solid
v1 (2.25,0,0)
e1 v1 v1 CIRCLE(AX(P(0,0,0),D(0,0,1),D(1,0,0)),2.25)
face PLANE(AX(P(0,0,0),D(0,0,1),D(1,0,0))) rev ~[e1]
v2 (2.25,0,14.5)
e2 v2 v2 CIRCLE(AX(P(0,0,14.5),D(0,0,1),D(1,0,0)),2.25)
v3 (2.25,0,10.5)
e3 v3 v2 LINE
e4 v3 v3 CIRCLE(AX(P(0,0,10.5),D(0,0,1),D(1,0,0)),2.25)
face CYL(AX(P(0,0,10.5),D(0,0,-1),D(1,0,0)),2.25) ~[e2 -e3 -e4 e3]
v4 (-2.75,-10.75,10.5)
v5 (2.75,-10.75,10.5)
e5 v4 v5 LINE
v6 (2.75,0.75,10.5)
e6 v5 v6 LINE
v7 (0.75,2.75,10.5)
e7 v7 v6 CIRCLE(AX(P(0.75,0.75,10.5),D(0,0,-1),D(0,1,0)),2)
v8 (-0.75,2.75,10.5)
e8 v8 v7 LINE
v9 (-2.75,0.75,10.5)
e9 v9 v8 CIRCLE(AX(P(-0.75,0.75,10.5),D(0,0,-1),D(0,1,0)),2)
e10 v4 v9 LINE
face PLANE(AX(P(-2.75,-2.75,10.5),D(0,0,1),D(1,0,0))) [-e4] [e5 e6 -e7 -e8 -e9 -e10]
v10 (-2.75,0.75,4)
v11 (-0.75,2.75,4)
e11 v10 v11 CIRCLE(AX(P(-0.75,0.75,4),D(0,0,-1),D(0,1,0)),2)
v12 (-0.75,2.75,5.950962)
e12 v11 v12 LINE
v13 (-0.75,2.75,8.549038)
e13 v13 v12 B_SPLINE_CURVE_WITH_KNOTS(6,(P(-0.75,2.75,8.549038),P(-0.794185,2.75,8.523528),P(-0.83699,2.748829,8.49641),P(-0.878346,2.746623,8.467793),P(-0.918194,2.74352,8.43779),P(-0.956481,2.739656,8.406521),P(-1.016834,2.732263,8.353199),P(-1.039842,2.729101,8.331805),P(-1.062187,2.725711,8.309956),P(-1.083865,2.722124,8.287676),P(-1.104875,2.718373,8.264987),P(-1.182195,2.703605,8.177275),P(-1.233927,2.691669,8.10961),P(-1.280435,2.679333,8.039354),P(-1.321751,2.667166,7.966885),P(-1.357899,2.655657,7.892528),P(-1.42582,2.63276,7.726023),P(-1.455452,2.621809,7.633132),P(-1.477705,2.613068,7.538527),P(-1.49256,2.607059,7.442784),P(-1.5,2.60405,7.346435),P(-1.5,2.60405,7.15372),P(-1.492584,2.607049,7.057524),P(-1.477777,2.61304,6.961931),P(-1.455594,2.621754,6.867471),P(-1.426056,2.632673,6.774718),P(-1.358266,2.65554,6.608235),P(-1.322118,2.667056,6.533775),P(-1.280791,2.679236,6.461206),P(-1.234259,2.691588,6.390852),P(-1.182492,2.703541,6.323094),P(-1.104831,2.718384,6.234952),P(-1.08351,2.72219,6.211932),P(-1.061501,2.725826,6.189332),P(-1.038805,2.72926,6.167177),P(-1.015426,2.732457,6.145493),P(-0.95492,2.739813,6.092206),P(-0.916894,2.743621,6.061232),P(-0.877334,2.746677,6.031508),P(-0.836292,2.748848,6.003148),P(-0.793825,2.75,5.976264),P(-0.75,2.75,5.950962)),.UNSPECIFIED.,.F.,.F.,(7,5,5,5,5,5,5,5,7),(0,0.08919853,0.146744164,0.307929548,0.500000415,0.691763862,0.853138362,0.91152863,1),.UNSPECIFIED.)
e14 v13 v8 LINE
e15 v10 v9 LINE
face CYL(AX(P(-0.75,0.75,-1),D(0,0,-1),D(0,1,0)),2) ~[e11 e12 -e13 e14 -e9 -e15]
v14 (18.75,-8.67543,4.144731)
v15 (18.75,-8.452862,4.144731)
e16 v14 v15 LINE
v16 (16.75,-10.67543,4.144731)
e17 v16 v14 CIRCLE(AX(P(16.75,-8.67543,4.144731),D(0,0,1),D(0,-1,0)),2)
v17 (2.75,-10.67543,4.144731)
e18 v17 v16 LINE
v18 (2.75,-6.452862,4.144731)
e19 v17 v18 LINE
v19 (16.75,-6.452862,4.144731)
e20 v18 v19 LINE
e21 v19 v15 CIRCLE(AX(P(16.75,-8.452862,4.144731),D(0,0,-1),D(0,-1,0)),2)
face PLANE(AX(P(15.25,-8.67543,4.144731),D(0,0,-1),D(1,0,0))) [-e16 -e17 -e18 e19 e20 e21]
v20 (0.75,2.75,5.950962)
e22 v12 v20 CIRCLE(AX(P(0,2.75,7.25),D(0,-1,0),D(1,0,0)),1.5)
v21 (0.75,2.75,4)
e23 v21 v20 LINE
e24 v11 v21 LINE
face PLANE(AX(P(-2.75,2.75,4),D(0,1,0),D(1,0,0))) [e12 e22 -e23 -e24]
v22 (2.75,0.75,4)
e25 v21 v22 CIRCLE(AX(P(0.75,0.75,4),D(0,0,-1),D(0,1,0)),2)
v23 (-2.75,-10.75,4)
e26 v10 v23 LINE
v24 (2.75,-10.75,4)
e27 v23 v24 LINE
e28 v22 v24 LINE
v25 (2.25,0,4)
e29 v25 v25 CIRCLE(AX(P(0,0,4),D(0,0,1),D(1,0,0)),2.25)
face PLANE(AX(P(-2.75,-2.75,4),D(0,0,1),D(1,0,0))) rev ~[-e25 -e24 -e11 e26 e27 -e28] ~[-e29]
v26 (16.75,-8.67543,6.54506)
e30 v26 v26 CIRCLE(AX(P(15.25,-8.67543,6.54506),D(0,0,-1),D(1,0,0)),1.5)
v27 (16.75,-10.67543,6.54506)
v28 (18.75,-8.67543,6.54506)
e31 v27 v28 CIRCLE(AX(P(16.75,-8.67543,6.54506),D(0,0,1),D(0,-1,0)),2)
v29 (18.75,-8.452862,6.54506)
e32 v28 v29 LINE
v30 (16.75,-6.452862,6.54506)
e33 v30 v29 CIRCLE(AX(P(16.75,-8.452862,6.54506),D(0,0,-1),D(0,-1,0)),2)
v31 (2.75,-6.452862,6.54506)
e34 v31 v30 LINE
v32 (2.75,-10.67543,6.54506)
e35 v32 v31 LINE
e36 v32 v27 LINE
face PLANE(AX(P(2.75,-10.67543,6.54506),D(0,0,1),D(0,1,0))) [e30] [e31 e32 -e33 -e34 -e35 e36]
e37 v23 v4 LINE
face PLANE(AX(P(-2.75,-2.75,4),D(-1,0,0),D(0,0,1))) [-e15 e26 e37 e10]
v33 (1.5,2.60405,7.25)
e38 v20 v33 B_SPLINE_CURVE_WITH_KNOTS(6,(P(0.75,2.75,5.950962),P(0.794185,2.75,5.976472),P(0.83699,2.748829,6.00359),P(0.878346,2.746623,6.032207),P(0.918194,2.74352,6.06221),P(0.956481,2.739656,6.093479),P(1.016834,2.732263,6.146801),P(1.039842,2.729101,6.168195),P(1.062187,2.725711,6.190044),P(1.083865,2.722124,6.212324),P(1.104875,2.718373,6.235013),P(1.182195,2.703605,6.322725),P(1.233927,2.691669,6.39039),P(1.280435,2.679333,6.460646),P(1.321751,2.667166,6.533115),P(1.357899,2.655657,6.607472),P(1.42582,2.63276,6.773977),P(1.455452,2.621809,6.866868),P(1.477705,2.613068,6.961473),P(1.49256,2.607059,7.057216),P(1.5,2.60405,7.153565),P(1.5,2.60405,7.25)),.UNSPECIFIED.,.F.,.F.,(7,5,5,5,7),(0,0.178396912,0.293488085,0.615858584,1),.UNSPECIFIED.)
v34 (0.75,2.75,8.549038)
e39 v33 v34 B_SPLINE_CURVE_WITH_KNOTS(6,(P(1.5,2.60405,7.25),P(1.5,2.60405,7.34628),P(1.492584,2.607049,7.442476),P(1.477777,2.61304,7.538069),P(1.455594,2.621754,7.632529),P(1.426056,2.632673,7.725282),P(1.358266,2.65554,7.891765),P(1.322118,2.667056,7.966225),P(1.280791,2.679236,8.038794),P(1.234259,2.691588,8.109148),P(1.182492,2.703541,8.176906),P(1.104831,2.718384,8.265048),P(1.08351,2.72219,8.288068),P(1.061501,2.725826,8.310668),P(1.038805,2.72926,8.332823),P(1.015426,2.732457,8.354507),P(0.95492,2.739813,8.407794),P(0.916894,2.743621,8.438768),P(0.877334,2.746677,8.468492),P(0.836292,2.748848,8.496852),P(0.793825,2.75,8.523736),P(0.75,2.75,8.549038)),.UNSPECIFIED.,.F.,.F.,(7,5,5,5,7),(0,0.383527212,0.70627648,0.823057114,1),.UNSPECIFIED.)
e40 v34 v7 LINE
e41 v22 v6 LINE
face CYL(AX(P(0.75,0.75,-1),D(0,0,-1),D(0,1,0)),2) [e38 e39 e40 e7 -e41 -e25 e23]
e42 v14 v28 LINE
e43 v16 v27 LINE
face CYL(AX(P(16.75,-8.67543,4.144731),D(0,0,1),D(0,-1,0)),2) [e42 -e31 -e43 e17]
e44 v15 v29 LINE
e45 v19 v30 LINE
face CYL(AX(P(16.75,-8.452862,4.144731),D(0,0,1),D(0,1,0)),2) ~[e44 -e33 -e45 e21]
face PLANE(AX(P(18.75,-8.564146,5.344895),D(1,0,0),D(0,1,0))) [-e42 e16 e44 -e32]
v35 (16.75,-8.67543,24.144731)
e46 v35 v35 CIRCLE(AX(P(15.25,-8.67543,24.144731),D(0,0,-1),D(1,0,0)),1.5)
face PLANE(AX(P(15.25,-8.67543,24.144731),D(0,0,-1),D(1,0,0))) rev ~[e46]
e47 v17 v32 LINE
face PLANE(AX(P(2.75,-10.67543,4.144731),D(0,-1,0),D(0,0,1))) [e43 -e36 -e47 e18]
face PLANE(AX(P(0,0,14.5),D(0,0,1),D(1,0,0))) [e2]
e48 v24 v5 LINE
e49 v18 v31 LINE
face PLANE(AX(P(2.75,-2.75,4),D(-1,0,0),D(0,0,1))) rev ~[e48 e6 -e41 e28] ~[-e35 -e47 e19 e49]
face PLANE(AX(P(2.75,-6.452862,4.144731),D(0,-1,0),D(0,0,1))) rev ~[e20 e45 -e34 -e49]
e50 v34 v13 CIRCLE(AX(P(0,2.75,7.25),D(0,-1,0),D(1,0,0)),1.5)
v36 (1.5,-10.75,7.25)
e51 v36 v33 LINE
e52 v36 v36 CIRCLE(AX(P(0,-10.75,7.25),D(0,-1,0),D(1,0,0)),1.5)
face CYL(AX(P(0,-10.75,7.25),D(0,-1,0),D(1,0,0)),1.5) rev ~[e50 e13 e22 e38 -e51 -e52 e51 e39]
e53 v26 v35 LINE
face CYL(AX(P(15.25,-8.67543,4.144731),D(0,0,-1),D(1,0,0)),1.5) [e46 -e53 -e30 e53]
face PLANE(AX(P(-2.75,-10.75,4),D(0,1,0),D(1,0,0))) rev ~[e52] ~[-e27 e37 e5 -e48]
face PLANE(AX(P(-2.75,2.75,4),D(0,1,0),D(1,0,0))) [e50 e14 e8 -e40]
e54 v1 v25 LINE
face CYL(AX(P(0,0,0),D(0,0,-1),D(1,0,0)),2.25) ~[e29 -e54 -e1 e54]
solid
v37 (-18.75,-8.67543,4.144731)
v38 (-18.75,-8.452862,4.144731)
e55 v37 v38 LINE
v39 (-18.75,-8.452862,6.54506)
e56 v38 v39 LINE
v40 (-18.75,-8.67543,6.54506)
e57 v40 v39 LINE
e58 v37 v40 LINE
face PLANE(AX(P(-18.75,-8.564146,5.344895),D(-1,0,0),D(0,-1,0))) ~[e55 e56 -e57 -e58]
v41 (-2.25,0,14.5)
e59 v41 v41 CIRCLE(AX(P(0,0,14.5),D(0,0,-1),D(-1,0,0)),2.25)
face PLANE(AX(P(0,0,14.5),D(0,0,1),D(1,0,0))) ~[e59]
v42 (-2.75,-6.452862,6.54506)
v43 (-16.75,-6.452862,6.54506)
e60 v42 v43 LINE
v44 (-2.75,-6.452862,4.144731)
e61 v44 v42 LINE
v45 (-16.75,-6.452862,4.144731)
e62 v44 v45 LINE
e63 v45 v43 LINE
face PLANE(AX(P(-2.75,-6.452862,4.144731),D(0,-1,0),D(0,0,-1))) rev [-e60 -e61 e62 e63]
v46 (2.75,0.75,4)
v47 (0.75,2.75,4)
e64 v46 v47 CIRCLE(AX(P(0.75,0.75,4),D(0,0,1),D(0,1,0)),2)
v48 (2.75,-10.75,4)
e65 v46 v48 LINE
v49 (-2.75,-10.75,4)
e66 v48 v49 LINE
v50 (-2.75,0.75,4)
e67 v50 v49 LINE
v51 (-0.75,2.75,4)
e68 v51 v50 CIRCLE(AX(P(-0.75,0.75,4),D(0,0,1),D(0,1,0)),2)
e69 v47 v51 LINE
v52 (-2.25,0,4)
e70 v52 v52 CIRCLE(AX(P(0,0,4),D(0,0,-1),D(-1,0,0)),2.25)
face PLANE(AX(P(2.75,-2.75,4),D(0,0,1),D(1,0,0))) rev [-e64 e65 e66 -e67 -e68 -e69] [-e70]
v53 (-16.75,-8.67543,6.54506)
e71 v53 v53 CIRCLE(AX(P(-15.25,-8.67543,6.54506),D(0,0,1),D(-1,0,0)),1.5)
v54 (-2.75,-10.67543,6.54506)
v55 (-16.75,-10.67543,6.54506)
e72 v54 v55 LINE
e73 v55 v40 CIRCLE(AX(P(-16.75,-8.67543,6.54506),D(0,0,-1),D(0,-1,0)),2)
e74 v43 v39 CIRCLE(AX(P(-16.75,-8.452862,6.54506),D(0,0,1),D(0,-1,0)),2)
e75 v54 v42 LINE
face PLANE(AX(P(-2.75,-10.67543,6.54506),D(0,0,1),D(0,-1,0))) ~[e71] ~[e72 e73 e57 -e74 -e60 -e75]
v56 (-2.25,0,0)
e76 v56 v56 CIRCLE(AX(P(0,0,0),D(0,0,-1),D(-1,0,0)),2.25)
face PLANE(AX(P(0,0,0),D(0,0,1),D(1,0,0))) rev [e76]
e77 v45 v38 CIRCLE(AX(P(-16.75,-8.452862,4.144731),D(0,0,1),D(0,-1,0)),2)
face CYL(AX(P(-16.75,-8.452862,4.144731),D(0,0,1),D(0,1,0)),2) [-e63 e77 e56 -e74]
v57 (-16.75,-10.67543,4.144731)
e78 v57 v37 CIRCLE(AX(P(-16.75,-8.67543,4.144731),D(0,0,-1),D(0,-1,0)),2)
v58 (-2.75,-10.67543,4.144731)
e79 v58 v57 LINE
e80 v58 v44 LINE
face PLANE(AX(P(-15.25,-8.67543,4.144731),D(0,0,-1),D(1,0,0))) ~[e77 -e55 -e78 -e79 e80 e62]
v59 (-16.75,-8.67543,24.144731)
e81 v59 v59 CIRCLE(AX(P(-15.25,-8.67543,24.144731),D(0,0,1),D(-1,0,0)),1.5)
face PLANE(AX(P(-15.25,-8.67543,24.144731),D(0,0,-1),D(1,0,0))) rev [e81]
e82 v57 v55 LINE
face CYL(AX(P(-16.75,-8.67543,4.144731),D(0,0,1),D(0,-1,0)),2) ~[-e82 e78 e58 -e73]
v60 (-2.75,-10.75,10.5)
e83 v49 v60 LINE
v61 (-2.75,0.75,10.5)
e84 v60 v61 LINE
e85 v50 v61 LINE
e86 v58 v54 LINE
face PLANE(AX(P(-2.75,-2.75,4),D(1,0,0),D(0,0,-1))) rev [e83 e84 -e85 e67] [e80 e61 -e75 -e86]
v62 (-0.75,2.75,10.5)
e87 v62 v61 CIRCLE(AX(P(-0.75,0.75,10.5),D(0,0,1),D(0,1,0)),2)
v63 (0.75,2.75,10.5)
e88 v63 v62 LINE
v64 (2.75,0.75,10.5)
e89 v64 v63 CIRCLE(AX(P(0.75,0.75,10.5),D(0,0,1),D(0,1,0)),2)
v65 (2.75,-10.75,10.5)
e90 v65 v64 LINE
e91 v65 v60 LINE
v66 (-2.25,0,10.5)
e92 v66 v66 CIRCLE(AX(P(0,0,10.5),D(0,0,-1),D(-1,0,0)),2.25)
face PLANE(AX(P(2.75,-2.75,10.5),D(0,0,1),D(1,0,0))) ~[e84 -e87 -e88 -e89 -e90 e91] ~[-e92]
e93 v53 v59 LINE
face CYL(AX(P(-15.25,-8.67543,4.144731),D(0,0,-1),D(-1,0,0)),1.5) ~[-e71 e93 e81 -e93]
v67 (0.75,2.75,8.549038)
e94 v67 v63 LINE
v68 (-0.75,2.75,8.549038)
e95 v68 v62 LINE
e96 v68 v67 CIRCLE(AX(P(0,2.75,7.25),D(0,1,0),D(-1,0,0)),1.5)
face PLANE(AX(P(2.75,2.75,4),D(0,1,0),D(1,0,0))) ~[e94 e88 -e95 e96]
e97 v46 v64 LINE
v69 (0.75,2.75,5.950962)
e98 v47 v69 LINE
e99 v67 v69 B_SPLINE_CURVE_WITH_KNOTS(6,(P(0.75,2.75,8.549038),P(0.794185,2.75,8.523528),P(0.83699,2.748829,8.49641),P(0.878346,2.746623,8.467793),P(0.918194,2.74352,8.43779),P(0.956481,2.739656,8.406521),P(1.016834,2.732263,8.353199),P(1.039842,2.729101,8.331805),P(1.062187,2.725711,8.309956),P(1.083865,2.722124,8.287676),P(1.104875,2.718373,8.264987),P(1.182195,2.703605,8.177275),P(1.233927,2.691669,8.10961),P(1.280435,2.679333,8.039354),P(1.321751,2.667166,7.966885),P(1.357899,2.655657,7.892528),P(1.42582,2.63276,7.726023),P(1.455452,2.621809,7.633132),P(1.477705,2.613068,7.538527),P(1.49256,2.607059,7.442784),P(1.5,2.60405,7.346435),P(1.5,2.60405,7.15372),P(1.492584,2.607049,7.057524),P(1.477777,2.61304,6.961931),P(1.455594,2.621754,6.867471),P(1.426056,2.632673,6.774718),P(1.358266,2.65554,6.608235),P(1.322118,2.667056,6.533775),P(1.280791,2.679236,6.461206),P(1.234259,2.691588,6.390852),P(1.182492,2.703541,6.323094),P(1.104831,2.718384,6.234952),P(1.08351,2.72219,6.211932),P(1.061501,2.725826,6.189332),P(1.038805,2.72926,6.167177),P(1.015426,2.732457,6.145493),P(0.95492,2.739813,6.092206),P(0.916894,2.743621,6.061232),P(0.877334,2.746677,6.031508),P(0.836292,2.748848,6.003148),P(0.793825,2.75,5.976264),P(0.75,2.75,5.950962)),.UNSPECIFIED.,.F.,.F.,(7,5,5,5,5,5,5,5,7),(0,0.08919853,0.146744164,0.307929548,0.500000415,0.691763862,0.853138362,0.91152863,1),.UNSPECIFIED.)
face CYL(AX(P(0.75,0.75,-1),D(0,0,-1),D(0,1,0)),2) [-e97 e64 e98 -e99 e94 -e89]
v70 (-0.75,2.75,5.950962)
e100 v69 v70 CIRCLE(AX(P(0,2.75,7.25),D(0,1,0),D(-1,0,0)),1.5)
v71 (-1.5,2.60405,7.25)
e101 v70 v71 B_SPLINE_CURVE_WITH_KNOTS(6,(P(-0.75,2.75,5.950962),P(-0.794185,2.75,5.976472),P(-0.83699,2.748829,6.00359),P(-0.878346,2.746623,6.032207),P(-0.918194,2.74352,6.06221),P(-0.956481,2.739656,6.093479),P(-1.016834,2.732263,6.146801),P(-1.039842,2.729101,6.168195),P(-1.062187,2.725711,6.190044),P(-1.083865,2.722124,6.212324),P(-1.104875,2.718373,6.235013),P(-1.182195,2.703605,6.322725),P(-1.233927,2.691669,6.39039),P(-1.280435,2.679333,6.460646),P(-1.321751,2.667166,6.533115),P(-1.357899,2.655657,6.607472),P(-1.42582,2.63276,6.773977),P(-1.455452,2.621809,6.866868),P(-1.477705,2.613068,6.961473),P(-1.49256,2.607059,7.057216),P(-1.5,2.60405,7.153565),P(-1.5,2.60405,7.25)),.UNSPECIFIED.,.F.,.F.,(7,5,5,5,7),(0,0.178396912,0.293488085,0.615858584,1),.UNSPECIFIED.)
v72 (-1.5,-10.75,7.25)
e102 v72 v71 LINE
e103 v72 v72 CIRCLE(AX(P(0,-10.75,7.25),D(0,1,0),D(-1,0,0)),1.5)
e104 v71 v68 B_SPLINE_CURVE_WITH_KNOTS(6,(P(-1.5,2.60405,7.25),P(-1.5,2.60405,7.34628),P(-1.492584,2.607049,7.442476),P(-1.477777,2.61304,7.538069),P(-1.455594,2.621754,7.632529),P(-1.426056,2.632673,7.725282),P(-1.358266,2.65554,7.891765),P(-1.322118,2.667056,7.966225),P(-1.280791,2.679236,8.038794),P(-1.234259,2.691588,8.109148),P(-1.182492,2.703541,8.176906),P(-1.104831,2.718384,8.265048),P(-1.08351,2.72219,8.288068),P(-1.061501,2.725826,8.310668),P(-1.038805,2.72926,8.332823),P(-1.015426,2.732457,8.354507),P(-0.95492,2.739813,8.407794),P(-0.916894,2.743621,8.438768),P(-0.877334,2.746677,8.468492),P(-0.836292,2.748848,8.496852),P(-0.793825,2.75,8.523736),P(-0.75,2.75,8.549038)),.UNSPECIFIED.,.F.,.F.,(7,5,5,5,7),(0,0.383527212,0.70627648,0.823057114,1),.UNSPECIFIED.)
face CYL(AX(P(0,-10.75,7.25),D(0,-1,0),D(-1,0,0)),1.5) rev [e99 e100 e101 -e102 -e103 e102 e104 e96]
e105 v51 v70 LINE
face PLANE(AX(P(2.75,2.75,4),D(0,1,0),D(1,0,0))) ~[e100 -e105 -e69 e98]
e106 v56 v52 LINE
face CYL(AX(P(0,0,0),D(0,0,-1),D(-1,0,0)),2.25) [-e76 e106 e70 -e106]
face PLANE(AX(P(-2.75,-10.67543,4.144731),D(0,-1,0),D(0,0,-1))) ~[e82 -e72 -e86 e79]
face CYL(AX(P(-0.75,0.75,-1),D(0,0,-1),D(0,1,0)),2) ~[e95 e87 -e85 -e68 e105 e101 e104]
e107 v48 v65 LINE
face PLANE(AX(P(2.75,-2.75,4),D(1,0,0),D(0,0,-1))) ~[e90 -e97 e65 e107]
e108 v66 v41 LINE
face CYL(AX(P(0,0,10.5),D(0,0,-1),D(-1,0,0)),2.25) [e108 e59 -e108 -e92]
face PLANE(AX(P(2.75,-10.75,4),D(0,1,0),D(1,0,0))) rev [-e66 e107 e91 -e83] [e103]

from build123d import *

# Parameters (mm, degrees)
F0_R        = 2.25
F1_DEPTH    = 4
F2_W        = 5.5
F2_H        = 5.5
F3_DEPTH    = 6.5
F4_R        = 2.25
F5_DEPTH    = 4
F6_DEPTH    = 8
F7_R        = 1.5
F8_DEPTH    = 13.5
F9_T1_DEPTH = 16.5
F11_W       = 4.2225685902
F11_H       = 2.4003293365
F12_DEPTH   = 16
F13_R       = 2
F14_R       = 1.5
F15_DEPTH   = 20


# Not quite as in the source:
# - a fillet or chamfer that OpenCascade refuses, or shapes differently, is made with other operations: its cross-section is extruded or revolved along the edge and cut away or added


with BuildPart() as f1:
    # F0 (on Top) → F1 (new body)
    with BuildSketch(Plane.XY):
        Circle(F0_R)
    extrude(amount=F1_DEPTH)

    # F2 (on face) → F3 (join)
    with BuildSketch(Plane.XY.offset(4)):
        Rectangle(F2_W, F2_H)
    extrude(amount=F3_DEPTH)

    # F4 (on face) → F5 (join)
    with BuildSketch(Plane.XY.offset(10.5)):
        Circle(F4_R)
    extrude(amount=F5_DEPTH)

    # F6 (add): a face of the model
    f6_faces = [f1.faces().sort_by_distance(p)[0] for p in [
        (0, -2.75, 7.25),
    ]]
    extrude(f6_faces, amount=F6_DEPTH)

    # F7 (on face) → F8 (cut, through all)
    with BuildSketch(Plane.XZ.offset(10.75)):
        with Locations((0, 7.25)):
            Circle(F7_R)
    extrude(amount=-F8_DEPTH, mode=Mode.SUBTRACT)

    # F9: fillet of radius 2 on 2 edges, made by hand

    # F9_s2 → F9_t1 (cut)
    with BuildSketch(Plane.XY.offset(-1)):
        with BuildLine():
            ThreePointArc((-0.75, 2.75), (-2.1642135624, 2.1642135624), (-2.75, 0.75))
            Line((-2.75, 0.75), (-2.75, 2.75))
            Line((-2.75, 2.75), (-0.75, 2.75))
        make_face()
        with BuildLine():
            ThreePointArc((0.75, 2.75), (2.1642135624, 2.1642135624), (2.75, 0.75))
            Line((2.75, 0.75), (2.75, 2.75))
            Line((2.75, 2.75), (0.75, 2.75))
        make_face()
    extrude(amount=F9_T1_DEPTH, mode=Mode.SUBTRACT)

    # F11 (on face) → F12 (join)
    with BuildSketch(Plane.YZ.offset(2.75)):
        with Locations((-8.5641460028, 5.3448951803)):
            Rectangle(F11_W, F11_H)
    extrude(amount=F12_DEPTH)

    # F13
    f13_edges = [f1.edges().sort_by_distance(p)[0] for p in [
        (18.75, -10.67543, 5.344895),
        (18.75, -6.452862, 5.344895),
    ]]
    fillet(f13_edges, radius=F13_R)

    # F14 (on face) → F15 (join)
    with BuildSketch(Plane(origin=(0, 0, 4.1447305121), x_dir=(1, 0, 0), z_dir=(0, 0, -1))):
        with Locations((15.25, 8.6754302979)):
            Circle(F14_R)
    extrude(amount=-F15_DEPTH)


with BuildPart() as f16_1:
    # F16: instance of F1
    add(f1.part.mirror(Plane.YZ))


solid = Compound([f1.part, f16_1.part])
